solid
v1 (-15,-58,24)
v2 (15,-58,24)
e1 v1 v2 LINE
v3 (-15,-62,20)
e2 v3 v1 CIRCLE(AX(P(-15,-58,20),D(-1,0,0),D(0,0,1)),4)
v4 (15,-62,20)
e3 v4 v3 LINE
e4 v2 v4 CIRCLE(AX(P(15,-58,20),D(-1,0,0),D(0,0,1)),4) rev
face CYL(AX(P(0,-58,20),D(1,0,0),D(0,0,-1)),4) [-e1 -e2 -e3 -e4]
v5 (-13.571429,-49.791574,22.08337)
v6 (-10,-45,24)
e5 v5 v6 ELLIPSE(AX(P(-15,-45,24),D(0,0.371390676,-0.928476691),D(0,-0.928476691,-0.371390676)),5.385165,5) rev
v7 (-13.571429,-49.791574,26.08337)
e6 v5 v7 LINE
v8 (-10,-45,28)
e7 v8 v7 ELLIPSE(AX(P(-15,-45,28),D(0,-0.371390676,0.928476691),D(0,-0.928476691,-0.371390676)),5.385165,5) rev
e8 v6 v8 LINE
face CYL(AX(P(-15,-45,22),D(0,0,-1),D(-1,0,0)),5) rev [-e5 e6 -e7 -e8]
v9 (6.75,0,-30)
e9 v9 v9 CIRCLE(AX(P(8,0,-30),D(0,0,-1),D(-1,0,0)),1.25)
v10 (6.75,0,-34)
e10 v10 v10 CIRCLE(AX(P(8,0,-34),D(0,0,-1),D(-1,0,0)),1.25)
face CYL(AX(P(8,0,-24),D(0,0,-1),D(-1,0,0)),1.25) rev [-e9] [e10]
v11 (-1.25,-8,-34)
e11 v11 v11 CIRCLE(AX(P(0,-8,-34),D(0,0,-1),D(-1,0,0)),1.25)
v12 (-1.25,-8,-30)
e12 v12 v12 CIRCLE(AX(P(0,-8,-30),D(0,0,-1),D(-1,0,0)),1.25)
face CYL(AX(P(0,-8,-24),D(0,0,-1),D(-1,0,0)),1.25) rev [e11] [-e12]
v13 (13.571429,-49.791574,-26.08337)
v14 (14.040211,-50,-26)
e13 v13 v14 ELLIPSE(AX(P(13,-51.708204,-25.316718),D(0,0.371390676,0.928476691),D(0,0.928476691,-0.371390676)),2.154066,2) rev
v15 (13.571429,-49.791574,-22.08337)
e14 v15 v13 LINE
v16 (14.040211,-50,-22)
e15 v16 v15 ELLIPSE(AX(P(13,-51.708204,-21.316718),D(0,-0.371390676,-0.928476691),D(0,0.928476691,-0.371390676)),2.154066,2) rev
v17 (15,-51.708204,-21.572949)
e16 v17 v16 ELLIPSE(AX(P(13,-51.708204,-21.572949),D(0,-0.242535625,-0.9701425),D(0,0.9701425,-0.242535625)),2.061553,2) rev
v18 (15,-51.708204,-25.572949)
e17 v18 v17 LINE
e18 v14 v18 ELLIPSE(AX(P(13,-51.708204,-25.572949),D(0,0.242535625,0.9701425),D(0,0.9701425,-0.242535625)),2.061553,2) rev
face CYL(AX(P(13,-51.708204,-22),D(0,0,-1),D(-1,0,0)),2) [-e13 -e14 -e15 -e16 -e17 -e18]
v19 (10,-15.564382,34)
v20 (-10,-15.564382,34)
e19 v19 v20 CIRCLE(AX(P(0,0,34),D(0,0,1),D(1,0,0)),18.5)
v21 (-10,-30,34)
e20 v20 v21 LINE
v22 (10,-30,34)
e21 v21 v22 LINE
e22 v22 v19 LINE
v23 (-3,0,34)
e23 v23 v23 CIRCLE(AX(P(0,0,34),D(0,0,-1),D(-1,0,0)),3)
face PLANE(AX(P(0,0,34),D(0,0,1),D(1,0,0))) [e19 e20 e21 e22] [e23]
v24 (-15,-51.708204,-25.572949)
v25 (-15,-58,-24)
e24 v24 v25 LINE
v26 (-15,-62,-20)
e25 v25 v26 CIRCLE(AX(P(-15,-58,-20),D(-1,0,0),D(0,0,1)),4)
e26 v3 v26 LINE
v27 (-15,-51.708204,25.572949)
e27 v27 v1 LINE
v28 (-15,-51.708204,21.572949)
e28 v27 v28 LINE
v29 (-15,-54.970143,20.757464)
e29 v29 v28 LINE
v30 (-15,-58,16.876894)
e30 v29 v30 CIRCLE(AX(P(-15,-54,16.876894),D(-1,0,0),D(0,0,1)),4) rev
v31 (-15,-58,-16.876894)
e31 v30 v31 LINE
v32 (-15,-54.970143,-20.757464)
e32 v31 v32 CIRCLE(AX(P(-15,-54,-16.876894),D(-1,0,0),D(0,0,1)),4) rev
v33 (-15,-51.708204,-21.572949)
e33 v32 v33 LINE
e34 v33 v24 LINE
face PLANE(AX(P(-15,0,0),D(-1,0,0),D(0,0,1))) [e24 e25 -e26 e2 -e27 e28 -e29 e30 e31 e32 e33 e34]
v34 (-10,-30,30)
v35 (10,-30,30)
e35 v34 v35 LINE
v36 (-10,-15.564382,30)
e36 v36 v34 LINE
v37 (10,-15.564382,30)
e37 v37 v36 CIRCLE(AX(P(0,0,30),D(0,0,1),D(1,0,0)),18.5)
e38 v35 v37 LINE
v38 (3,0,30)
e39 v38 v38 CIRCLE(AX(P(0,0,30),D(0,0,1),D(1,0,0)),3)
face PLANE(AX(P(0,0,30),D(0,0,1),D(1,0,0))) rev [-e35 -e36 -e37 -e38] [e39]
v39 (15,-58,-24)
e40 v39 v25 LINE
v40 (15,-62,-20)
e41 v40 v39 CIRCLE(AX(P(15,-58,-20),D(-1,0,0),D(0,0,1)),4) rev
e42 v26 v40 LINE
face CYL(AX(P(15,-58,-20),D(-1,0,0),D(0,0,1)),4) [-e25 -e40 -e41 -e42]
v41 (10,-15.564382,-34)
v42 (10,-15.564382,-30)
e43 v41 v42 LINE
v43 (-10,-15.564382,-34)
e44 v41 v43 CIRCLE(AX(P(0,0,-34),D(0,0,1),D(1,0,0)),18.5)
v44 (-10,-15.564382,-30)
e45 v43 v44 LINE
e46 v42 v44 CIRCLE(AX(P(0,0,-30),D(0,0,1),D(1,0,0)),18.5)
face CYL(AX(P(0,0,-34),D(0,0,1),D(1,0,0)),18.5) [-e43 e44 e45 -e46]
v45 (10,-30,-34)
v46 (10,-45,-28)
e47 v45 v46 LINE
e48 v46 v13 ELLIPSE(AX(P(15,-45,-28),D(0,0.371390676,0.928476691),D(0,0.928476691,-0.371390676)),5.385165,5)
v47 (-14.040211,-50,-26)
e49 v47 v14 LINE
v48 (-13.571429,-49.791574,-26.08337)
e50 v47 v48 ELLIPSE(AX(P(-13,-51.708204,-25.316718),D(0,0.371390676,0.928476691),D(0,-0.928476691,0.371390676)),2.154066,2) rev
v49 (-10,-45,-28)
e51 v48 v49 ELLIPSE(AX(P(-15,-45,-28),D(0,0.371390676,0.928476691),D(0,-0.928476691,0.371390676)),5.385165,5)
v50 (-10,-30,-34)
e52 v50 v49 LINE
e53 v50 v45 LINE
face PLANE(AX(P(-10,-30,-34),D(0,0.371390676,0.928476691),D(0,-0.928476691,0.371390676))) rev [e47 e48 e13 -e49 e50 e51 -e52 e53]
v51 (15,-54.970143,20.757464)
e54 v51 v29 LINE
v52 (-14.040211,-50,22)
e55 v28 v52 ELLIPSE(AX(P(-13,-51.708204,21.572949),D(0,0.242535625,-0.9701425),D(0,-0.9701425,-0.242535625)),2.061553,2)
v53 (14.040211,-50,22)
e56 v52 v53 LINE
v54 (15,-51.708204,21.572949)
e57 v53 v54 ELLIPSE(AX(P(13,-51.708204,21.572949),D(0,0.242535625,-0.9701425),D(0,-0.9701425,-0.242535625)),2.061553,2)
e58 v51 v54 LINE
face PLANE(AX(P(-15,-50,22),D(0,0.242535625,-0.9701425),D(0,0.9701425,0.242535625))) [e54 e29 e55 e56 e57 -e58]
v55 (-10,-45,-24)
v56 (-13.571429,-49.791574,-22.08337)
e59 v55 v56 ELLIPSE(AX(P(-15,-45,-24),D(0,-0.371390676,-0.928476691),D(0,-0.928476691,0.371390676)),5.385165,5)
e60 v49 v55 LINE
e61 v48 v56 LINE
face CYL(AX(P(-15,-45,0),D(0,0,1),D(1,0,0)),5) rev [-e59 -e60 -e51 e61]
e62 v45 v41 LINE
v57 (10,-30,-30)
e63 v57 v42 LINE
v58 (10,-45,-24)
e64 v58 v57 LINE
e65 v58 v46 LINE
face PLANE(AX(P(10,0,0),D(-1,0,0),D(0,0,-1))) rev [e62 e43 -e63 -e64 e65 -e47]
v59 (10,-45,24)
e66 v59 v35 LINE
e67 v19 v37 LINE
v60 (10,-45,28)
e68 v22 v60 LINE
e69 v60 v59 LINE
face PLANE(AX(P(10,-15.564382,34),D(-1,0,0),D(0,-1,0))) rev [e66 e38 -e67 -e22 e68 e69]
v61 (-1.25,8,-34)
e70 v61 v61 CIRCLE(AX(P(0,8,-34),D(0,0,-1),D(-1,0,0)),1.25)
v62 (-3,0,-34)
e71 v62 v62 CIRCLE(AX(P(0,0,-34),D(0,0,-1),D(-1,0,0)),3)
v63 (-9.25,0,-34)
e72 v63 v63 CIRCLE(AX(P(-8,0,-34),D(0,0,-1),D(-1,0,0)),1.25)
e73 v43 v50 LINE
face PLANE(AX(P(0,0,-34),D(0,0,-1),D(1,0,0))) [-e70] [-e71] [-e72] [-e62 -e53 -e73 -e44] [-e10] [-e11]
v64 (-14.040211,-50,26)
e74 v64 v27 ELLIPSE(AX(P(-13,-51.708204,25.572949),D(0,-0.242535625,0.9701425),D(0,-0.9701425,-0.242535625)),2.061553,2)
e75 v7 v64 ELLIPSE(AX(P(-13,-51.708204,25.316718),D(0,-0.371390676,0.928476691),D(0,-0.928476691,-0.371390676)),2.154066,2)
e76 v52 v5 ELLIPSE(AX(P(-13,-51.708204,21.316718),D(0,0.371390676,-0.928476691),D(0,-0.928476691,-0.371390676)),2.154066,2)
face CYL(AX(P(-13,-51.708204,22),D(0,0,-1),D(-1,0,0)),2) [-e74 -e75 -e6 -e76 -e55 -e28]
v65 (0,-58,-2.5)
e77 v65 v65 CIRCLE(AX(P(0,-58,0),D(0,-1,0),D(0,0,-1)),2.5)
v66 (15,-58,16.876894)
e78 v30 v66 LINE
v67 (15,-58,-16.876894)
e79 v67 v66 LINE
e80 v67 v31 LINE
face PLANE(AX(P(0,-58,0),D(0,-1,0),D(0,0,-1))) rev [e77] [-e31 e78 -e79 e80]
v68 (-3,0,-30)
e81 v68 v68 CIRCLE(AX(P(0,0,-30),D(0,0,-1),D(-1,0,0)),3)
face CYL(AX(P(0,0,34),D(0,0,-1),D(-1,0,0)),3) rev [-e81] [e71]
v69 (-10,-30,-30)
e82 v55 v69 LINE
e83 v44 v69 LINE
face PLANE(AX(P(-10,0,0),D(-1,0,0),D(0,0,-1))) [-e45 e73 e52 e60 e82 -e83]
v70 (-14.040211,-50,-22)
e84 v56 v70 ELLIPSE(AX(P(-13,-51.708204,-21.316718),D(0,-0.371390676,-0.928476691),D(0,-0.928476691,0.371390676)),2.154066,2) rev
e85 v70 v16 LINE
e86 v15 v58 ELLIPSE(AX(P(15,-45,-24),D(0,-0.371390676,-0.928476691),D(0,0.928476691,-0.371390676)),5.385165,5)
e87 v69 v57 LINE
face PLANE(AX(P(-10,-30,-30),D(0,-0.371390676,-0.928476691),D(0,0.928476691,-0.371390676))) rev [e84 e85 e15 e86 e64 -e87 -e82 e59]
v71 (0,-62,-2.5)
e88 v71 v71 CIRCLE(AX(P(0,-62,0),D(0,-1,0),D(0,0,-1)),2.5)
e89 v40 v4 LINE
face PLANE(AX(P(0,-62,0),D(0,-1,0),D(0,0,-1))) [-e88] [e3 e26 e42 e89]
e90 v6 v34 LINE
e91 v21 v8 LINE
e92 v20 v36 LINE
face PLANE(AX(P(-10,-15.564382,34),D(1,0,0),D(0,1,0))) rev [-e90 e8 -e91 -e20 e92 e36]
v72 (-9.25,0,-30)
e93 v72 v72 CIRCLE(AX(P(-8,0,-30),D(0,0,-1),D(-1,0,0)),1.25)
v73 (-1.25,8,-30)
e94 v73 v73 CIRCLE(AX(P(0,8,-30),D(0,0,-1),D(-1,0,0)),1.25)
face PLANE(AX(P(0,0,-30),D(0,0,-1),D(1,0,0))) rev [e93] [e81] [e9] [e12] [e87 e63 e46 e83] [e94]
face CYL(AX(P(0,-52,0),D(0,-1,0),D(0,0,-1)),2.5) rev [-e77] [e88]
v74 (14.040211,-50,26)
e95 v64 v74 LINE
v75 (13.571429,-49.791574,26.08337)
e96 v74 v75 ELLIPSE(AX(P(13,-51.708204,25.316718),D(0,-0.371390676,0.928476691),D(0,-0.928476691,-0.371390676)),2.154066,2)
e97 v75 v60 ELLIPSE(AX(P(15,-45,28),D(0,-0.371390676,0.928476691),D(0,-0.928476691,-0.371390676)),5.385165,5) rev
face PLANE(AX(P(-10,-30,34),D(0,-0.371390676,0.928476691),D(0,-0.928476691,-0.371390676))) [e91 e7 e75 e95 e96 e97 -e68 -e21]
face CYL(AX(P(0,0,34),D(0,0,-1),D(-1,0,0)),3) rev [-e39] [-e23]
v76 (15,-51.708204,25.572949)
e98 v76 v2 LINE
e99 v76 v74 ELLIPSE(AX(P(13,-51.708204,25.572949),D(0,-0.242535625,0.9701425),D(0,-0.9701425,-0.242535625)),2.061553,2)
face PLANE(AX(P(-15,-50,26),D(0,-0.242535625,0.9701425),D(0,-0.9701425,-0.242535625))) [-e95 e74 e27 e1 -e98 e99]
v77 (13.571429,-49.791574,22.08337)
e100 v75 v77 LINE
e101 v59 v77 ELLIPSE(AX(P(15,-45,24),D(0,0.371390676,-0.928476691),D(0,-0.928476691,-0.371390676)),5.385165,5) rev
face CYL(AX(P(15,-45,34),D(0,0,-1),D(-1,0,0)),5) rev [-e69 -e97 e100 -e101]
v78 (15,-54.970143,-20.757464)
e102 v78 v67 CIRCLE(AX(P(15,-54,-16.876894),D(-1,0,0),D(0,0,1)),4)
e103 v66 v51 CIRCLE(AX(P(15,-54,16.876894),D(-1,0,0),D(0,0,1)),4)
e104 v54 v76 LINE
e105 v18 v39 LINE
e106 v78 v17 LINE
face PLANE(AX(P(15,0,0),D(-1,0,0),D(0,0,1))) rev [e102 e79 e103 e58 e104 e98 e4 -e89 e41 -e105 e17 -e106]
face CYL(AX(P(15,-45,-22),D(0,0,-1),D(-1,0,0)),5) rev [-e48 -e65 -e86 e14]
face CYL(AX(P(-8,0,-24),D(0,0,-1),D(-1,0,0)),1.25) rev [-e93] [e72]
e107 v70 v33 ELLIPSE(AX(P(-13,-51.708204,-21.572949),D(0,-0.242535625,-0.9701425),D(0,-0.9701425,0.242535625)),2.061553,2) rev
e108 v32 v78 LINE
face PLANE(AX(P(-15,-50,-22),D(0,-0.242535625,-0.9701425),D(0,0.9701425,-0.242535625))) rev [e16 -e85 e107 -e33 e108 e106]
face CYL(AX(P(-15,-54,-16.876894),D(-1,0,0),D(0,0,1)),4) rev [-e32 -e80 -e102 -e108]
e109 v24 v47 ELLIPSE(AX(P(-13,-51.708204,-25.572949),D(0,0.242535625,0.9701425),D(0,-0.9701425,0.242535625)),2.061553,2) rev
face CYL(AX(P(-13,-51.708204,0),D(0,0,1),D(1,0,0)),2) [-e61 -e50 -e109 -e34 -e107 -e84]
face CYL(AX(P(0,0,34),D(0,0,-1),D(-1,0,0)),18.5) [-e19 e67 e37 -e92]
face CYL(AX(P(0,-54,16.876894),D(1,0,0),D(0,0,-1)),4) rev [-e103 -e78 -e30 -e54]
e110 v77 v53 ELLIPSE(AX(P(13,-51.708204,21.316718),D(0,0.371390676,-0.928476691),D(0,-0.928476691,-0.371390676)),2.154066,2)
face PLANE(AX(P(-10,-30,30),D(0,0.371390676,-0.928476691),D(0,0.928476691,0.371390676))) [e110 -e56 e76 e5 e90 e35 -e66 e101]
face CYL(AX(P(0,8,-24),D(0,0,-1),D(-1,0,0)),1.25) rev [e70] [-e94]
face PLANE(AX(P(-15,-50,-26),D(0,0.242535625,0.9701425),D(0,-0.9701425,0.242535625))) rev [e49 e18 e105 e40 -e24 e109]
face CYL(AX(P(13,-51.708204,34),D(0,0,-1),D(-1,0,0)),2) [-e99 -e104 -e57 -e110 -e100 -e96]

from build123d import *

# Parameters (mm, degrees)
EXTRUDE_1_DEPTH        = 4
EXTRUDE_2_DEPTH        = 10
EXTRUDE_3_DEPTH        = 15
FILLET_1_R             = 5
FILLET_2_R             = 5
SKETCH_4_W             = 30
SKETCH_4_H             = 24
EXTRUDE_4_DEPTH        = 4
FILLET_3_R             = 4
FILLET_4_R             = 4
FILLET_5_R             = 2
FILLET_6_R             = 2
MIRROR_START           = -15
MIRROR_7_DEPTH         = 30
MIRROR_10_COPY_1_DEPTH = 4
MIRROR_10_COPY_2_DEPTH = 10
MIRROR_10_COPY_3_DEPTH = 4
MIRROR_10_COPY_4_DEPTH = 10
FILLET_7_R             = 4
FILLET_8_R             = 5
FILLET_9_R             = 2
SKETCH_5_R             = 2.5
CUT_EXTRUDE_1_DEPTH    = 10
SKETCH_6_R             = 3
CUT_EXTRUDE_2_DEPTH    = 94.862931981
SKETCH_7_R             = 1.25
CUT_EXTRUDE_3_DEPTH    = 10


# Read off the part's stored shape, not the designer's step: 镜向7
# Some blends are built 0.0001 mm under size
with BuildPart() as part:
    # 草图1 → 凸台-拉伸1 (new body)
    with BuildSketch(Plane.XY.offset(30)):
        with BuildLine():
            Line((-10, -15.564382416), (-10, -30))
            Line((-10, -30), (10, -30))
            Line((10, -30), (10, -15.564382416))
            ThreePointArc((10, -15.564382416), (0, 18.5), (-10, -15.564382416))
        make_face()
    extrude_1 = extrude(amount=EXTRUDE_1_DEPTH)

    # 草图2 → 凸台-拉伸2 (add, symmetric)
    with BuildSketch(Plane(origin=(0, 0, 0), x_dir=(0, 0, -1), z_dir=(1, 0, 0))):
        Polygon((-30, -30), (-34, -30), (-26, -50), (-22, -50), align=None)
    extrude_2 = extrude(amount=EXTRUDE_2_DEPTH, both=True)

    # 草图3 → 凸台-拉伸3 (add, symmetric)
    with BuildSketch(Plane(origin=(0, 0, 0), x_dir=(0, 0, -1), z_dir=(1, 0, 0))):
        Polygon((-22, -50), (-26, -50), (-24, -58), (-20, -58), align=None)
    extrude(amount=EXTRUDE_3_DEPTH, both=True)

    # 圆角1
    # the kernel refuses this fillet: 5 mm, written as the material it adds along each edge
    with BuildSketch(Plane(origin=(-10, -50, 38.5), x_dir=(-1, 0, 0), z_dir=(0, 0, -1))) as fillet_1_piece_1_section:
        with BuildLine():
            CenterArc((FILLET_1_R, FILLET_1_R), FILLET_1_R, 180, 90)
            Line((0, FILLET_1_R), (0, 0))
            Line((0, 0), (FILLET_1_R, 0))
        make_face()
    fillet_1_piece_1 = extrude(amount=29, mode=Mode.PRIVATE)
    fillet_1_piece_1 = split(fillet_1_piece_1, bisect_by=Plane(origin=(-10.532362598, -47.811458148, 26.547135463), z_dir=(0, -0.24253562503633297, 0.9701425001453319)), keep=Keep.TOP, mode=Mode.PRIVATE)
    fillet_1_piece_1 = split(fillet_1_piece_1, bisect_by=Plane(origin=(-10.532362598, -47.905028454, 26.837988618), z_dir=(0, 0.3713906763541037, -0.9284766908852594)), keep=Keep.TOP, mode=Mode.PRIVATE)
    add(fillet_1_piece_1)
    with BuildSketch(Plane(origin=(-10, -50, 38.5), x_dir=(-1, 0, 0), z_dir=(0, 0, -1))) as fillet_1_piece_2_section:
        with BuildLine():
            CenterArc((FILLET_1_R, FILLET_1_R), FILLET_1_R, 180, 90)
            Line((0, FILLET_1_R), (0, 0))
            Line((0, 0), (FILLET_1_R, 0))
        make_face()
    fillet_1_piece_2 = extrude(amount=29, mode=Mode.PRIVATE)
    fillet_1_piece_2 = split(fillet_1_piece_2, bisect_by=Plane(origin=(-11.158452705, -48.423398816, 22.394150296), z_dir=(0, -0.2425356250363334, 0.9701425001453319)), keep=Keep.TOP, mode=Mode.PRIVATE)
    fillet_1_piece_2 = split(fillet_1_piece_2, bisect_by=Plane(origin=(-11.158452705, -49.364575286, 26.158856178), z_dir=(0, 0.24253562503633297, -0.9701425001453319)), keep=Keep.TOP, mode=Mode.PRIVATE)
    fillet_1_piece_2 = split(fillet_1_piece_2, bisect_by=Plane(origin=(-11.158452705, -49.630929403, 26.147628239), z_dir=(0, 0.3713906763541037, -0.9284766908852594)), keep=Keep.TOP, mode=Mode.PRIVATE)
    fillet_1_piece_2 = split(fillet_1_piece_2, bisect_by=Plane(origin=(-11.158452705, -48.251619058, 22.699352377), z_dir=(0, -0.3713906763541037, 0.9284766908852594)), keep=Keep.TOP, mode=Mode.PRIVATE)
    add(fillet_1_piece_2)

    # 圆角2
    # the kernel refuses this fillet: 5 mm, written as the material it adds along each edge
    with BuildSketch(Plane(origin=(10, -50, 38.5), x_dir=(0, 1, 0), z_dir=(0, 0, -1))) as fillet_2_piece_1_section:
        with BuildLine():
            CenterArc((FILLET_2_R, FILLET_2_R), FILLET_2_R, 180, 90)
            Line((0, FILLET_2_R), (0, 0))
            Line((0, 0), (FILLET_2_R, 0))
        make_face()
    fillet_2_piece_1 = extrude(amount=29, mode=Mode.PRIVATE)
    fillet_2_piece_1 = split(fillet_2_piece_1, bisect_by=Plane(origin=(10.532362598, -47.905028454, 26.837988618), z_dir=(0, 0.3713906763541038, -0.9284766908852593)), keep=Keep.TOP, mode=Mode.PRIVATE)
    fillet_2_piece_1 = split(fillet_2_piece_1, bisect_by=Plane(origin=(10.532362598, -47.811458148, 26.547135463), z_dir=(0, -0.24253562503633297, 0.9701425001453319)), keep=Keep.TOP, mode=Mode.PRIVATE)
    add(fillet_2_piece_1)
    with BuildSketch(Plane(origin=(10, -50, 38.5), x_dir=(0, 1, 0), z_dir=(0, 0, -1))) as fillet_2_piece_2_section:
        with BuildLine():
            CenterArc((FILLET_2_R, FILLET_2_R), FILLET_2_R, 180, 90)
            Line((0, FILLET_2_R), (0, 0))
            Line((0, 0), (FILLET_2_R, 0))
        make_face()
    fillet_2_piece_2 = extrude(amount=29, mode=Mode.PRIVATE)
    fillet_2_piece_2 = split(fillet_2_piece_2, bisect_by=Plane(origin=(11.158452705, -48.251619058, 22.699352377), z_dir=(0, -0.3713906763541038, 0.9284766908852593)), keep=Keep.TOP, mode=Mode.PRIVATE)
    fillet_2_piece_2 = split(fillet_2_piece_2, bisect_by=Plane(origin=(11.158452705, -49.630929403, 26.147628239), z_dir=(0, 0.3713906763541038, -0.9284766908852593)), keep=Keep.TOP, mode=Mode.PRIVATE)
    fillet_2_piece_2 = split(fillet_2_piece_2, bisect_by=Plane(origin=(11.158452705, -48.423398816, 22.394150296), z_dir=(0, -0.2425356250363334, 0.9701425001453319)), keep=Keep.TOP, mode=Mode.PRIVATE)
    fillet_2_piece_2 = split(fillet_2_piece_2, bisect_by=Plane(origin=(11.158452705, -49.364575286, 26.158856178), z_dir=(0, 0.24253562503633297, -0.9701425001453319)), keep=Keep.TOP, mode=Mode.PRIVATE)
    add(fillet_2_piece_2)

    # 草图4 → 凸台-拉伸4 (add)
    with BuildSketch(Plane.XZ.offset(58)):
        with Locations((0, 12)):
            Rectangle(SKETCH_4_W, SKETCH_4_H)
    extrude_4 = extrude(amount=EXTRUDE_4_DEPTH)

    # 圆角3
    fillet_3_edges = [part.edges().sort_by_distance(p)[0] for p in [
        (0, -62, 24),
    ]]
    fillet(fillet_3_edges, radius=FILLET_3_R - 0.0001)  # a hair under: the kernel refuses the full size

    # 圆角4
    fillet_4_edges = [part.edges().sort_by_distance(p)[0] for p in [
        (0, -58, 20),
    ]]
    fillet(fillet_4_edges, radius=FILLET_4_R)

    # 圆角5
    fillet_5_edges = [part.edges().sort_by_distance(p)[0] for p in [
        (-15, -50, 24),
    ]]
    fillet(fillet_5_edges, radius=FILLET_5_R)

    # 圆角6
    fillet_6_edges = [part.edges().sort_by_distance(p)[0] for p in [
        (15, -50, 24),
    ]]
    fillet(fillet_6_edges, radius=FILLET_6_R)

    # 镜向6: 凸台-拉伸4 across plane
    add(extrude_4.mirror(Plane.XY))

    # 镜向7 outline → 镜向7 (add)
    with BuildSketch(Plane.YZ.offset(MIRROR_START)):
        with BuildLine():
            Line((-50, -22), (-54.9701425, -20.757464375))
            ThreePointArc((-54.9701425, -20.757464375), (-57.152821752, -19.338543212), (-58, -16.876894374))
            Line((-58, -16.876894374), (-58, -24))
            Line((-58, -24), (-50, -26))
            Line((-50, -26), (-50, -22))
        make_face()
    extrude(amount=MIRROR_7_DEPTH)

    # 镜向10 copy 1 sketch → 镜向10 copy 1 (add)
    with BuildSketch(Plane.XY.offset(30)):
        with BuildLine():
            Line((-10, -15.564382416), (-10, -30))
            Line((-10, -30), (10, -30))
            Line((10, -30), (10, -15.564382416))
            ThreePointArc((10, -15.564382416), (0, 18.5), (-10, -15.564382416))
        make_face()
    extrude(amount=MIRROR_10_COPY_1_DEPTH)

    # 镜向10 copy 2 sketch → 镜向10 copy 2 (add, symmetric)
    with BuildSketch(Plane(origin=(0, 0, 0), x_dir=(0, 0, -1), z_dir=(1, 0, 0))):
        Polygon((-30, -30), (-34, -30), (-26, -50), (-22, -50), align=None)
    extrude(amount=MIRROR_10_COPY_2_DEPTH, both=True)



with BuildPart() as mirror_9_1:
    # 镜向9: 凸台-拉伸1, 凸台-拉伸2 across plane
    add(extrude_1.mirror(Plane.XY))
    add(extrude_2.mirror(Plane.XY))

    # 镜向10 copy 3 sketch → 镜向10 copy 3 (add)
    with BuildSketch(Plane(origin=(0, 0, -30), x_dir=(1, 0, 0), z_dir=(0, 0, -1))):
        with BuildLine():
            Line((-10, 15.564382416), (-10, 30))
            Line((-10, 30), (10, 30))
            Line((10, 30), (10, 15.564382416))
            ThreePointArc((10, 15.564382416), (0, -18.5), (-10, 15.564382416))
        make_face()
    extrude(amount=MIRROR_10_COPY_3_DEPTH)


with BuildPart() as part_1:
    add(part.part)

    add(mirror_9_1.part)  # 镜向10 copy 4 merges 镜向9_1
    # 镜向10 copy 4 sketch → 镜向10 copy 4 (add, symmetric)
    with BuildSketch(Plane(origin=(0, 0, 0), x_dir=(0, 0, 1), z_dir=(1, 0, 0))):
        Polygon((-30, 30), (-34, 30), (-26, 50), (-22, 50), align=None)
    extrude(amount=MIRROR_10_COPY_4_DEPTH, both=True)

    # 圆角7
    fillet_7_edges = [part_1.edges().sort_by_distance(p)[0] for p in [
        (0, -62, -24),
    ]]
    fillet(fillet_7_edges, radius=FILLET_7_R - 0.0001)  # a hair under: the kernel refuses the full size

    # 圆角8
    # the kernel refuses this fillet: 5 mm, written as the material it adds along each edge
    with BuildSketch(Plane(origin=(10, -50, -38.5), x_dir=(1, 0, 0), z_dir=(0, 0, 1))) as fillet_8_piece_1_section:
        with BuildLine():
            CenterArc((FILLET_8_R, FILLET_8_R), FILLET_8_R, 180, 90)
            Line((0, FILLET_8_R), (0, 0))
            Line((0, 0), (FILLET_8_R, 0))
        make_face()
    fillet_8_piece_1 = extrude(amount=29, mode=Mode.PRIVATE)
    fillet_8_piece_1 = split(fillet_8_piece_1, bisect_by=Plane(origin=(10.532362598, -47.811458148, -26.547135463), z_dir=(0, -0.24253562503633297, -0.9701425001453319)), keep=Keep.TOP, mode=Mode.PRIVATE)
    fillet_8_piece_1 = split(fillet_8_piece_1, bisect_by=Plane(origin=(10.532362598, -47.905028454, -26.837988618), z_dir=(0, 0.3713906763541037, 0.9284766908852594)), keep=Keep.TOP, mode=Mode.PRIVATE)
    add(fillet_8_piece_1)
    with BuildSketch(Plane(origin=(10, -50, -38.5), x_dir=(1, 0, 0), z_dir=(0, 0, 1))) as fillet_8_piece_2_section:
        with BuildLine():
            CenterArc((FILLET_8_R, FILLET_8_R), FILLET_8_R, 180, 90)
            Line((0, FILLET_8_R), (0, 0))
            Line((0, 0), (FILLET_8_R, 0))
        make_face()
    fillet_8_piece_2 = extrude(amount=29, mode=Mode.PRIVATE)
    fillet_8_piece_2 = split(fillet_8_piece_2, bisect_by=Plane(origin=(11.158452705, -49.364575286, -26.158856178), z_dir=(0, 0.24253562503633297, 0.9701425001453319)), keep=Keep.TOP, mode=Mode.PRIVATE)
    fillet_8_piece_2 = split(fillet_8_piece_2, bisect_by=Plane(origin=(11.158452705, -48.423398816, -22.394150296), z_dir=(0, -0.24253562503633266, -0.970142500145332)), keep=Keep.TOP, mode=Mode.PRIVATE)
    fillet_8_piece_2 = split(fillet_8_piece_2, bisect_by=Plane(origin=(11.158452705, -49.630929403, -26.147628239), z_dir=(0, 0.3713906763541037, 0.9284766908852594)), keep=Keep.TOP, mode=Mode.PRIVATE)
    fillet_8_piece_2 = split(fillet_8_piece_2, bisect_by=Plane(origin=(11.158452705, -48.251619058, -22.699352377), z_dir=(0, -0.3713906763541037, -0.9284766908852594)), keep=Keep.TOP, mode=Mode.PRIVATE)
    add(fillet_8_piece_2)
    with BuildSketch(Plane(origin=(-10, -50, -38.5), x_dir=(-1, 0, 0), z_dir=(0, 0, 1))) as fillet_8_piece_3_section:
        with BuildLine():
            CenterArc((FILLET_8_R, -FILLET_8_R), FILLET_8_R, 90, 90)
            Line((0, -FILLET_8_R), (0, 0))
            Line((0, 0), (FILLET_8_R, 0))
        make_face()
    fillet_8_piece_3 = extrude(amount=29, mode=Mode.PRIVATE)
    fillet_8_piece_3 = split(fillet_8_piece_3, bisect_by=Plane(origin=(-10.532362598, -47.811458148, -26.547135463), z_dir=(0, -0.24253562503633297, -0.9701425001453319)), keep=Keep.TOP, mode=Mode.PRIVATE)
    fillet_8_piece_3 = split(fillet_8_piece_3, bisect_by=Plane(origin=(-10.532362598, -47.905028454, -26.837988618), z_dir=(0, 0.3713906763541037, 0.9284766908852594)), keep=Keep.TOP, mode=Mode.PRIVATE)
    add(fillet_8_piece_3)
    with BuildSketch(Plane(origin=(-10, -50, -38.5), x_dir=(-1, 0, 0), z_dir=(0, 0, 1))) as fillet_8_piece_4_section:
        with BuildLine():
            CenterArc((FILLET_8_R, -FILLET_8_R), FILLET_8_R, 90, 90)
            Line((0, -FILLET_8_R), (0, 0))
            Line((0, 0), (FILLET_8_R, 0))
        make_face()
    fillet_8_piece_4 = extrude(amount=29, mode=Mode.PRIVATE)
    fillet_8_piece_4 = split(fillet_8_piece_4, bisect_by=Plane(origin=(-11.158452705, -49.364575286, -26.158856178), z_dir=(0, 0.24253562503633297, 0.9701425001453319)), keep=Keep.TOP, mode=Mode.PRIVATE)
    fillet_8_piece_4 = split(fillet_8_piece_4, bisect_by=Plane(origin=(-11.158452705, -48.423398816, -22.394150296), z_dir=(0, -0.24253562503633266, -0.970142500145332)), keep=Keep.TOP, mode=Mode.PRIVATE)
    fillet_8_piece_4 = split(fillet_8_piece_4, bisect_by=Plane(origin=(-11.158452705, -49.630929403, -26.147628239), z_dir=(0, 0.3713906763541037, 0.9284766908852594)), keep=Keep.TOP, mode=Mode.PRIVATE)
    fillet_8_piece_4 = split(fillet_8_piece_4, bisect_by=Plane(origin=(-11.158452705, -48.251619058, -22.699352377), z_dir=(0, -0.3713906763541037, -0.9284766908852594)), keep=Keep.TOP, mode=Mode.PRIVATE)
    add(fillet_8_piece_4)

    # 圆角9
    fillet_9_edges = [part_1.edges().sort_by_distance(p)[0] for p in [
        (15, -50, -24),
        (-15, -50, -24),
    ]]
    fillet(fillet_9_edges, radius=FILLET_9_R)

    # 草图5 → 切除-拉伸1 (cut)
    with BuildSketch(Plane.XZ.offset(62)):
        with Locations(Location((0, 0, 0), (0, 0, 270))):
            Circle(SKETCH_5_R)
    extrude(amount=-CUT_EXTRUDE_1_DEPTH, mode=Mode.SUBTRACT)

    # 草图6 → 切除-拉伸2 (cut, through all)
    with BuildSketch(Plane(origin=(0, 0, -34), x_dir=(-1, 0, 0), z_dir=(0, 0, -1))):
        Circle(SKETCH_6_R)
    extrude(amount=-CUT_EXTRUDE_2_DEPTH, mode=Mode.SUBTRACT)

    # 草图7 → 切除-拉伸3 (cut)
    with BuildSketch(Plane(origin=(0, 0, -34), x_dir=(-1, 0, 0), z_dir=(0, 0, -1))):
        with Locations((0, 8)):
            Circle(SKETCH_7_R)
        with Locations((8, 0)):
            Circle(SKETCH_7_R)
        with Locations((0, -8)):
            Circle(SKETCH_7_R)
        with Locations((-8, 0)):
            Circle(SKETCH_7_R)
    extrude(amount=-CUT_EXTRUDE_3_DEPTH, mode=Mode.SUBTRACT)


solid = part_1.part
